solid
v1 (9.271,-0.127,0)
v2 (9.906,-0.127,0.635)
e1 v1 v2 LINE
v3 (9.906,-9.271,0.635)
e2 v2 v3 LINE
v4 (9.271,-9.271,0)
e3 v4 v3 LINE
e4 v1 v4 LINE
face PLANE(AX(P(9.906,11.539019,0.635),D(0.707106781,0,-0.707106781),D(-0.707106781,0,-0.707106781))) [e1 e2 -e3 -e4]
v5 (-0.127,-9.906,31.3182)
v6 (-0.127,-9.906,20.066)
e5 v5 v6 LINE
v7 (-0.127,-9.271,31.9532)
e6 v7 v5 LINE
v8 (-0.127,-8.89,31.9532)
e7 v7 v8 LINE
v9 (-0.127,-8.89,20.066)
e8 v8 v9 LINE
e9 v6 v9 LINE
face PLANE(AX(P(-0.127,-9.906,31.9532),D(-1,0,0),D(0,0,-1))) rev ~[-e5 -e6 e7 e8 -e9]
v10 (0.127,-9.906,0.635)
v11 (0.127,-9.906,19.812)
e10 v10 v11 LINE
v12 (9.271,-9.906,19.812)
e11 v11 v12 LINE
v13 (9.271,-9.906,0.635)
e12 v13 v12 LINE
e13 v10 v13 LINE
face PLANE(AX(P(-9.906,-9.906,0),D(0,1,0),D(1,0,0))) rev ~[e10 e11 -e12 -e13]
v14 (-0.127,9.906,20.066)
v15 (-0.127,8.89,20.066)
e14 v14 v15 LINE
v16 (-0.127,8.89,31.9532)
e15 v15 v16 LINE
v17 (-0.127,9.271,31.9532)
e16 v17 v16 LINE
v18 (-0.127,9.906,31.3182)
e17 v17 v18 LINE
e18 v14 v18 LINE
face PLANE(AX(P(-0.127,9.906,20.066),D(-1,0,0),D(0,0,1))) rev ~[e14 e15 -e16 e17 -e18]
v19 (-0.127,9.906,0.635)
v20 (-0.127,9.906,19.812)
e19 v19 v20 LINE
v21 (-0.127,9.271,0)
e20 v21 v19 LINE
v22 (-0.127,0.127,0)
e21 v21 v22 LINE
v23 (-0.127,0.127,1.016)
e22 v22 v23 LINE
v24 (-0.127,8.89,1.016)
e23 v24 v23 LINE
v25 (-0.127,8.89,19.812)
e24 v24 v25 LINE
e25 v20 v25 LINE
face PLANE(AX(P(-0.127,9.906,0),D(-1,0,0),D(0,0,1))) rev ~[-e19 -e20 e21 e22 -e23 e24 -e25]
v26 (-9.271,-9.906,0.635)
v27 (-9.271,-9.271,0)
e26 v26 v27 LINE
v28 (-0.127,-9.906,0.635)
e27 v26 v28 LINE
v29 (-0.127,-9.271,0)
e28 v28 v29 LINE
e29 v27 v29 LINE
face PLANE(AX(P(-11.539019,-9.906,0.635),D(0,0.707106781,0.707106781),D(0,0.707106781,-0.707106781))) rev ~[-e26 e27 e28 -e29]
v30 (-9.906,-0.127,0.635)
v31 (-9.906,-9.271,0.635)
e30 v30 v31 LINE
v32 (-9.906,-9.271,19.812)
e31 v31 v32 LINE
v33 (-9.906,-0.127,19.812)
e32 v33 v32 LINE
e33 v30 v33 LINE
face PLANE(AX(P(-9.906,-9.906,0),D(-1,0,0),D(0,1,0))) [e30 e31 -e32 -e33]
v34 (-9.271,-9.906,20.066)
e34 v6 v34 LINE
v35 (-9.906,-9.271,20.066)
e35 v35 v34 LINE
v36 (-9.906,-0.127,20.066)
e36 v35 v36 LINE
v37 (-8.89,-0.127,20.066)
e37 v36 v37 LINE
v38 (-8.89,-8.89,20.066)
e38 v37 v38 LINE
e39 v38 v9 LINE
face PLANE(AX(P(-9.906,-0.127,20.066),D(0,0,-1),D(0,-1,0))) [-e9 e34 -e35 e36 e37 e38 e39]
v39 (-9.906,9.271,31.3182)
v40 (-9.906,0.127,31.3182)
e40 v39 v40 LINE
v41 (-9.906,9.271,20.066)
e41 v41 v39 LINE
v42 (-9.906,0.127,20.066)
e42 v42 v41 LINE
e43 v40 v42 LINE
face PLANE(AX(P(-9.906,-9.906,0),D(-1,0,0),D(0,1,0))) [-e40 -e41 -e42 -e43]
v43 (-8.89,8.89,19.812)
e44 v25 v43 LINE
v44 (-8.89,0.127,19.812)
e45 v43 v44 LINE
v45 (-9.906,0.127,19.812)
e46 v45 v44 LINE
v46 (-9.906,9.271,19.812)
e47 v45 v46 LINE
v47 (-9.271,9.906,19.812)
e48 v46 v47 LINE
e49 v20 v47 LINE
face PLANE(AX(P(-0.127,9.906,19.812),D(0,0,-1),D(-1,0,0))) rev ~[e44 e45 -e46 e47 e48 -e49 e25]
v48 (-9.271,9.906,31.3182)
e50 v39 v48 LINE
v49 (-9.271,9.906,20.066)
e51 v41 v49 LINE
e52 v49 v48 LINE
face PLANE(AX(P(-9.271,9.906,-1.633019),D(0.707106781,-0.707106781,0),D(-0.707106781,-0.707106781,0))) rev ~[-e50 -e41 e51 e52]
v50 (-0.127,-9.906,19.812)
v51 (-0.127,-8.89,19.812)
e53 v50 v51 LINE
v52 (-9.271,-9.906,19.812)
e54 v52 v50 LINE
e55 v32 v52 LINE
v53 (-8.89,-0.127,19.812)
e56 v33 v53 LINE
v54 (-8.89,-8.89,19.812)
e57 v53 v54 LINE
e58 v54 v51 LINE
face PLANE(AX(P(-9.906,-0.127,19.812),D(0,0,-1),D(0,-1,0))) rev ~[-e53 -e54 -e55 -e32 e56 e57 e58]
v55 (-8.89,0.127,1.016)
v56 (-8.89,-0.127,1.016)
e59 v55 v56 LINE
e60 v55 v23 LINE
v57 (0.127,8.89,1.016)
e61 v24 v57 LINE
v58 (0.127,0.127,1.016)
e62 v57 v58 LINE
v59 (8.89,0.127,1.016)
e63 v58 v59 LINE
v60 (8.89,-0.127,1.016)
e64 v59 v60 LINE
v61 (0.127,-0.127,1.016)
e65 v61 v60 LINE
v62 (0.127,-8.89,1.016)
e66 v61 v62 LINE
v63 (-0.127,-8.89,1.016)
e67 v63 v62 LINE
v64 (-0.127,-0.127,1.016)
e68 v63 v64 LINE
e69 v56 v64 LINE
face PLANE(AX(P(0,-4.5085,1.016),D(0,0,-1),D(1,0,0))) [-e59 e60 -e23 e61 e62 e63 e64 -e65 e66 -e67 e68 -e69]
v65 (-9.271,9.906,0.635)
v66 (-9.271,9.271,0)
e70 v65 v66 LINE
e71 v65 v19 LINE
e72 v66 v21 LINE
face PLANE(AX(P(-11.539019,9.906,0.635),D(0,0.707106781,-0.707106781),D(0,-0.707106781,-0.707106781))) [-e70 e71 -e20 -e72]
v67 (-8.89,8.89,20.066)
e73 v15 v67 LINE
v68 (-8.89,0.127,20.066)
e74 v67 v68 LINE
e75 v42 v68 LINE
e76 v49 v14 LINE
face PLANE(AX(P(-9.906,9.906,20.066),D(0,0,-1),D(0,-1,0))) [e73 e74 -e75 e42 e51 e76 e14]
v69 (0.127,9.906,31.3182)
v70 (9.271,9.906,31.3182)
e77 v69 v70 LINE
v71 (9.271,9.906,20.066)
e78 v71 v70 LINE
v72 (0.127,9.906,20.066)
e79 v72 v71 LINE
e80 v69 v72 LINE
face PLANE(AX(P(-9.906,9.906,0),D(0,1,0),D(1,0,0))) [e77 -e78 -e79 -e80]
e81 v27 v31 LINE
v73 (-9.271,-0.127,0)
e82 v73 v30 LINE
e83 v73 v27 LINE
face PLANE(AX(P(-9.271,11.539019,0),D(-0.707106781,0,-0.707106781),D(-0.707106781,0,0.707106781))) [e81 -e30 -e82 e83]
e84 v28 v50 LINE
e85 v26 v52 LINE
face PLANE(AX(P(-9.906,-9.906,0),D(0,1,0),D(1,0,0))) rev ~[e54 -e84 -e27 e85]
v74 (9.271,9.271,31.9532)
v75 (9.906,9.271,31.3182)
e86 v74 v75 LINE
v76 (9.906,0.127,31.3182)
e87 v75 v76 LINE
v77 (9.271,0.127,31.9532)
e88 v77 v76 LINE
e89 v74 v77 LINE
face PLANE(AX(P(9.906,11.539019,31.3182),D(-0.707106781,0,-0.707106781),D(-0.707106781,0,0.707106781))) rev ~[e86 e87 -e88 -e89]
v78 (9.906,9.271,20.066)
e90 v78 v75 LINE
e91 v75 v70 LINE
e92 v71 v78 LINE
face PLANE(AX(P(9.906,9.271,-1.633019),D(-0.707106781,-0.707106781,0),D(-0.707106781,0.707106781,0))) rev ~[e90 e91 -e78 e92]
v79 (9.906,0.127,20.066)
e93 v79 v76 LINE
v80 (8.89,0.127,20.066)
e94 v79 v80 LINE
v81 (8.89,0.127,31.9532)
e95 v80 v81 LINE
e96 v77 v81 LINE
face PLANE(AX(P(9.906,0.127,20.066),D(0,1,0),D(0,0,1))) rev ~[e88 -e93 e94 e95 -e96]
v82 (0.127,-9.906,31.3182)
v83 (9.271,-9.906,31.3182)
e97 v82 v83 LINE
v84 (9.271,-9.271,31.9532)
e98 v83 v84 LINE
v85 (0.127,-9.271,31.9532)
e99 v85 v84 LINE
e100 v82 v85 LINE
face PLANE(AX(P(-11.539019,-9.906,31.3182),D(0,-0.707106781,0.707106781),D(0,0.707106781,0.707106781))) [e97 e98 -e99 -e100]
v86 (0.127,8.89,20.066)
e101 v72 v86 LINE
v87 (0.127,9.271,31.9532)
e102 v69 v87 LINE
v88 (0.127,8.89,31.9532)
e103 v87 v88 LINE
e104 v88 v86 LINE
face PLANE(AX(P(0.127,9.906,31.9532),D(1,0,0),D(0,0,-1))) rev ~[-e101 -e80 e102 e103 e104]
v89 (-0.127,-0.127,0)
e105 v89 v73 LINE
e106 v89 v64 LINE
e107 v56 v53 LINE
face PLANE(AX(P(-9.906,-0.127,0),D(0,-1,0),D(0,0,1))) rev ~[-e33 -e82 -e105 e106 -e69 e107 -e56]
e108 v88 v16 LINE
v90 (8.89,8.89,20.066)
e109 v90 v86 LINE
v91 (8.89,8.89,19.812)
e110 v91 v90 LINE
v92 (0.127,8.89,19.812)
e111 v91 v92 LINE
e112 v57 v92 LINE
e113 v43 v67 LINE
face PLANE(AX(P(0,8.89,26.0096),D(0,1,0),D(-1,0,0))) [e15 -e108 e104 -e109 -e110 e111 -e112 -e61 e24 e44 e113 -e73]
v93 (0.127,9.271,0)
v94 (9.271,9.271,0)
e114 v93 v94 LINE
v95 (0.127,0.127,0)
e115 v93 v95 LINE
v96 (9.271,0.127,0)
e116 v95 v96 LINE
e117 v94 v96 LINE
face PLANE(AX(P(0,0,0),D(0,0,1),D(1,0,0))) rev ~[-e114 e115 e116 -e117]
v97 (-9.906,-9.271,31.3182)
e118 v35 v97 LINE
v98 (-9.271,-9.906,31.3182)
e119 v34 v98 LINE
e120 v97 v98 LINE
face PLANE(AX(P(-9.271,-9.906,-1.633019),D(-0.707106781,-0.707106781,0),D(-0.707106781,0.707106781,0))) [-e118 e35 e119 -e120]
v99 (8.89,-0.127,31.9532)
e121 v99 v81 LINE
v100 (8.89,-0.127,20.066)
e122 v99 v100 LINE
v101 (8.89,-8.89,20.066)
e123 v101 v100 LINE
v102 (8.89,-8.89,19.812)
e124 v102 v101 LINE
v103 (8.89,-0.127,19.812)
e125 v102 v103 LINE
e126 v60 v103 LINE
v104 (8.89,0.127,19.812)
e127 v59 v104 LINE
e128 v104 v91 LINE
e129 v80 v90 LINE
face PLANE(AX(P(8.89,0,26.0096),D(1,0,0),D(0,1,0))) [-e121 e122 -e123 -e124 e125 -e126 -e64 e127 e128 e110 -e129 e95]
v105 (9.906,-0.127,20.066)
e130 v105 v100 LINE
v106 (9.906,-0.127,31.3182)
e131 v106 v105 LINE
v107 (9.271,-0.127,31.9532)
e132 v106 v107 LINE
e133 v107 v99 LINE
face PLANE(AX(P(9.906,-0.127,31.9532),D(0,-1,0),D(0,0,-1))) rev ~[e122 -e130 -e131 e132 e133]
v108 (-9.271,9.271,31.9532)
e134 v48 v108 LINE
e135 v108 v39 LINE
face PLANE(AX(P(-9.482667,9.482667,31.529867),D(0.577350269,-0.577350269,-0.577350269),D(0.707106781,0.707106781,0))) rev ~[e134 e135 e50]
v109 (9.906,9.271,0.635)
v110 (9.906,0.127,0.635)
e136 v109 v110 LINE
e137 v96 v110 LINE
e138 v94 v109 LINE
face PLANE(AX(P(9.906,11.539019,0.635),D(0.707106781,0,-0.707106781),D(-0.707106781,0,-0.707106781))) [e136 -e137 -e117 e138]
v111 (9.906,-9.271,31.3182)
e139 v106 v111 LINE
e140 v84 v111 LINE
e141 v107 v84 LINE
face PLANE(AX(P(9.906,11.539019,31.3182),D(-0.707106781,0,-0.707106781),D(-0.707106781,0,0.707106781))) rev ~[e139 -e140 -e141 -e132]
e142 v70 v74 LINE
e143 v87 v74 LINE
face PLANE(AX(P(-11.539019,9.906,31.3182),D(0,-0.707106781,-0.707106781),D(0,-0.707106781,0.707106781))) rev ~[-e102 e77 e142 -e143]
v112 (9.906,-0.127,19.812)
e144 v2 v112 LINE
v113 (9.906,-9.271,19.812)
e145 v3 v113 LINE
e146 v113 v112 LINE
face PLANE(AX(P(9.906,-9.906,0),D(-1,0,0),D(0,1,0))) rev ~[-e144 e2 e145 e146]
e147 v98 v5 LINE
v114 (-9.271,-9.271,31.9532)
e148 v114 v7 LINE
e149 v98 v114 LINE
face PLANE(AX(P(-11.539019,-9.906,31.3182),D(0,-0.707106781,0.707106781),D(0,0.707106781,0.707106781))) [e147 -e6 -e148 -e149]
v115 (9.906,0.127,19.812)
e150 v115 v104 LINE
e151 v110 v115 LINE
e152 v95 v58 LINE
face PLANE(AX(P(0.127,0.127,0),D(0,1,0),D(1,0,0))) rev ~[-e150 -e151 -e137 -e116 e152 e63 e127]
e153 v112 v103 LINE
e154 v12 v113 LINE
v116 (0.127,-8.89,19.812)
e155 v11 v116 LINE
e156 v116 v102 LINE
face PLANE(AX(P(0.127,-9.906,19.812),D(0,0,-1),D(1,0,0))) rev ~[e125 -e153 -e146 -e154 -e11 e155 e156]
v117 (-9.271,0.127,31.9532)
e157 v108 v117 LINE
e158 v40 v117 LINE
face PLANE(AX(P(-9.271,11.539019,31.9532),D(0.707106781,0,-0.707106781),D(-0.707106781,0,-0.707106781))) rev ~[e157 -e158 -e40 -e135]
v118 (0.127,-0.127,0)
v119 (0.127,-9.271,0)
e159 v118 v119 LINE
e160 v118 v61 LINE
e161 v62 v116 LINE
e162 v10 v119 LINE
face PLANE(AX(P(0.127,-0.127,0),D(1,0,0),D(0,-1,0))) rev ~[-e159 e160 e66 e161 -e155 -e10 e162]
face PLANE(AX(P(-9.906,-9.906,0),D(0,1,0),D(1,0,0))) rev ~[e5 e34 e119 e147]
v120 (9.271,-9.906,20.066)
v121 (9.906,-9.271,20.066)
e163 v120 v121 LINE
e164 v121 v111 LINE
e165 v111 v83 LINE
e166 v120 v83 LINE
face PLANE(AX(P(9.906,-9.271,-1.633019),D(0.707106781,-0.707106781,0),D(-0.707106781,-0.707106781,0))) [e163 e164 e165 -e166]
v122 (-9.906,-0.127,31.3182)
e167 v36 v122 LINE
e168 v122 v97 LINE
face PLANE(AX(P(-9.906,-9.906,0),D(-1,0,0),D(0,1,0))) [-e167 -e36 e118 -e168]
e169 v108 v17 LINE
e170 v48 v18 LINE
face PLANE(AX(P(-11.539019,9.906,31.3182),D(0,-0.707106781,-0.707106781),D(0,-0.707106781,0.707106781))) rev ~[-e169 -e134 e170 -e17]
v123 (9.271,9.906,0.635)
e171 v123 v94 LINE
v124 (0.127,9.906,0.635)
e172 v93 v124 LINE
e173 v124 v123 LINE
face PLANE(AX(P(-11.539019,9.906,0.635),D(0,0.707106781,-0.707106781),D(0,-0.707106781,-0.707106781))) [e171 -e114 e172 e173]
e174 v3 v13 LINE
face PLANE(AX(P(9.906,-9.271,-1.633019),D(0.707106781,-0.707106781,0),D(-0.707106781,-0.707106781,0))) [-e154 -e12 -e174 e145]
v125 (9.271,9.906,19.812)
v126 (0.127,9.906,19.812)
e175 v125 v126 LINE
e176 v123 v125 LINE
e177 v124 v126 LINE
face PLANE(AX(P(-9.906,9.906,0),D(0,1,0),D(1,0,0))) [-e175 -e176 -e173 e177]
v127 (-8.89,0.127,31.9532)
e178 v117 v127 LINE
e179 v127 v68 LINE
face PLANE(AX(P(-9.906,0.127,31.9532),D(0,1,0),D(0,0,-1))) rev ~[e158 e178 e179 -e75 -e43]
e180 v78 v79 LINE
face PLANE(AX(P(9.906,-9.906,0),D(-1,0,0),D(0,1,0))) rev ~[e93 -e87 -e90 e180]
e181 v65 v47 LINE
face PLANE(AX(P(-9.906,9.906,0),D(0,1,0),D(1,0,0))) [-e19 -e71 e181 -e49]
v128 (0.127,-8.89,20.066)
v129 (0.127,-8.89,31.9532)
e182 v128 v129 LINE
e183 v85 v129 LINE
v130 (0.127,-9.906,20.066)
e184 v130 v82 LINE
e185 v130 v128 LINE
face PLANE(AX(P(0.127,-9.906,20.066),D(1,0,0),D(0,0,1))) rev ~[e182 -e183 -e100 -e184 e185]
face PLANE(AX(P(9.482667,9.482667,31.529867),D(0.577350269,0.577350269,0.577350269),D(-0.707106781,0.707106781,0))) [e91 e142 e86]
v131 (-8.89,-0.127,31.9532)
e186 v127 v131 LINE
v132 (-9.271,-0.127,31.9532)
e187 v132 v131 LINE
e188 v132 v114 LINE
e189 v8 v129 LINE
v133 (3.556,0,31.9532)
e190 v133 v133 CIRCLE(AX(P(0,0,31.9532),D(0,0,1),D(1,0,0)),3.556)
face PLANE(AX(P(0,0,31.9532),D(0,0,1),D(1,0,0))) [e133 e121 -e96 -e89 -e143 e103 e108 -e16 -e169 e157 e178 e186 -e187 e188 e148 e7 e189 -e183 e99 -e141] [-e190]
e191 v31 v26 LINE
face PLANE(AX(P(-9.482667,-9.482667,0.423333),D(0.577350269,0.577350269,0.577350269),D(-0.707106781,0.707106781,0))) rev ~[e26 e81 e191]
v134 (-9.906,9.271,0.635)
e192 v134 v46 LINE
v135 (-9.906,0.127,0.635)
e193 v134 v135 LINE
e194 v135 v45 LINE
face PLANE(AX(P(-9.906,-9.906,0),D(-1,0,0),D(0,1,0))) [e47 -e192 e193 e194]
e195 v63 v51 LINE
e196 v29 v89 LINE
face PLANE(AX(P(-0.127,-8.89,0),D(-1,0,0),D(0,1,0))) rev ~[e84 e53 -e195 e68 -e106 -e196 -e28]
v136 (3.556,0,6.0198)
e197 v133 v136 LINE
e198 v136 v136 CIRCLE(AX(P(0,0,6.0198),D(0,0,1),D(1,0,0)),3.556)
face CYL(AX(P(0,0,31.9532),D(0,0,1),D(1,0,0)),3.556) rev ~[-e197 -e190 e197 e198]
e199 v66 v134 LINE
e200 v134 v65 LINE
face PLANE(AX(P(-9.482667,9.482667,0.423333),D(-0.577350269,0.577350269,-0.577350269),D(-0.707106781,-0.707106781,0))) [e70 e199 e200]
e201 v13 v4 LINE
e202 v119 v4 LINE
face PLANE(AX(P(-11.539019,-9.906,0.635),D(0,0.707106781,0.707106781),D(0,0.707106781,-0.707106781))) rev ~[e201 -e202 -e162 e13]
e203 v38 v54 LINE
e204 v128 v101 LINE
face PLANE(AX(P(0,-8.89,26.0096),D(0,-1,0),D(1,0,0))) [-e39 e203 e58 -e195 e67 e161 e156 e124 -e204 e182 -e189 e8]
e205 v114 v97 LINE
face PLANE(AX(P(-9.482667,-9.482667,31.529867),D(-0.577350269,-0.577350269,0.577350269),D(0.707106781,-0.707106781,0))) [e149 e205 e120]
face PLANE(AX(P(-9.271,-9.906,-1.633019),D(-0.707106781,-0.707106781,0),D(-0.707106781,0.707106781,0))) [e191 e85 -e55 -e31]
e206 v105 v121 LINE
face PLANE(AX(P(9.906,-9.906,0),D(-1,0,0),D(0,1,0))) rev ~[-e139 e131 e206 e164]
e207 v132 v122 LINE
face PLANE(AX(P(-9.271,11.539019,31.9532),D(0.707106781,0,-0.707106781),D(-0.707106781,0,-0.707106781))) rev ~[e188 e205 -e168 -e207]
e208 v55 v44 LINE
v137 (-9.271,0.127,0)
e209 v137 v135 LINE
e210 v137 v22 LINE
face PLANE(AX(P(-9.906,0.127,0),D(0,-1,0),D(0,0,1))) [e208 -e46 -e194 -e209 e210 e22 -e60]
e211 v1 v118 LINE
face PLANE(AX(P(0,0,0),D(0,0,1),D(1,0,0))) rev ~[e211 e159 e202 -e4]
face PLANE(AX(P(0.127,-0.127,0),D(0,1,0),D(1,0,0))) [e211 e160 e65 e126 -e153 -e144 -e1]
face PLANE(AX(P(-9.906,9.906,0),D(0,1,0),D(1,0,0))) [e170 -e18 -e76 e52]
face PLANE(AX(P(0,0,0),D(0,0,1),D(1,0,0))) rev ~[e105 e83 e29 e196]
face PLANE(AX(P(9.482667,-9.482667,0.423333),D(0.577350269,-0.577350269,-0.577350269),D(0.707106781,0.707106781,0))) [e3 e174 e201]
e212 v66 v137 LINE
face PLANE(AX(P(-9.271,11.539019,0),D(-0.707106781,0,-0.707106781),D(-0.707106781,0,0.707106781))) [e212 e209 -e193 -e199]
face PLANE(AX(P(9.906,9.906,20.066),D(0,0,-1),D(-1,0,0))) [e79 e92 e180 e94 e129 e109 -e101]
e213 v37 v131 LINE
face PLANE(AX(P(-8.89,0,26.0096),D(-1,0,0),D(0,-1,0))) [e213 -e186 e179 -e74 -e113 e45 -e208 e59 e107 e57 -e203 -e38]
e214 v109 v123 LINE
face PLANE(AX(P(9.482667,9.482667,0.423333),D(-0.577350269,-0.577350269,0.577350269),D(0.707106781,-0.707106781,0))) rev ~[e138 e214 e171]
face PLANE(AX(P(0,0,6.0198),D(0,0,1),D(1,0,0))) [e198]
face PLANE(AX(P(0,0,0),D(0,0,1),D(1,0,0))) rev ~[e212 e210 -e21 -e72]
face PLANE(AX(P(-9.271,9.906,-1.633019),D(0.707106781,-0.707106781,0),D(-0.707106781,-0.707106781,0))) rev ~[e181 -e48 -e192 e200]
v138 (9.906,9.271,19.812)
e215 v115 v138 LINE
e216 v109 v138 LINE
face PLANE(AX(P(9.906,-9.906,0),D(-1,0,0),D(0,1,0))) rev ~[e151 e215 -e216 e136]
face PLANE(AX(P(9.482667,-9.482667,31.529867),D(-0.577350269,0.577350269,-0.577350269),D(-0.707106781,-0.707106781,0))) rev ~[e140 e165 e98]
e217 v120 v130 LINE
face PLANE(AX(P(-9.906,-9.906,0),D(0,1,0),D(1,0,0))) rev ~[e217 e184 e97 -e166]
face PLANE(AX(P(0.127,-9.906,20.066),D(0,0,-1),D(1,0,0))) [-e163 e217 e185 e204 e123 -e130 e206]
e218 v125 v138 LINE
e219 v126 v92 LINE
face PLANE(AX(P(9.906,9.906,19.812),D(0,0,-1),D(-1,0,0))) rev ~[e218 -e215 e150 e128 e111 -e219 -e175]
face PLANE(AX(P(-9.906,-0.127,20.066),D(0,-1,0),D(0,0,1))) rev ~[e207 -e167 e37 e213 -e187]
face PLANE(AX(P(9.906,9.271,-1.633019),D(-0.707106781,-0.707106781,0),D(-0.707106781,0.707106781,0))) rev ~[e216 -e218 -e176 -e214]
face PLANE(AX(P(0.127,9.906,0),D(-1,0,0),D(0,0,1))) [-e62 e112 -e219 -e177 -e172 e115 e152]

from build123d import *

# Parameters (mm, degrees)
F0_W            = 19.812
F0_H            = 19.812
F1_DEPTH        = 31.9532
F2_R            = 3.556
F3_DEPTH        = 25.9334
F4_T1_DEPTH     = 0.8065583261
F4_T3_DEPTH     = 0.8065583261
F4_T5_DEPTH     = 0.8065583261
F4_T7_DEPTH     = 0.8065583261
F4_T9_DEPTH     = 0.8065583261
F4_T11_DEPTH    = 0.8065583261
F4_T13_DEPTH    = 0.8065583261
F4_T15_DEPTH    = 0.8065583261
F4_T17_DEPTH    = 35.2192373947
F4_T19_DEPTH    = 23.0780373947
F4_T21_DEPTH    = 23.0780373947
F5_W            = 0.254
F5_H            = 11.8872
F5_H_2          = 0.254
F5_W_2          = 9.779
F5_H_3          = 19.812
F6_DEPTH        = 1.016
F6_COPIES_COUNT = 4
F7_W            = 0.254
F7_H            = 8.763
F7_H_2          = 0.254
F7_W_2          = 8.763
F8_DEPTH        = 1.016


# Not quite as in the source:
# - a fillet or chamfer that OpenCascade refuses, or shapes differently, is made with other operations: its cross-section is extruded or revolved along the edge and cut away or added
# - a pattern or mirror of a feature is missing from the dataset's text; its kind, count and spacing are read off the source's solid


with BuildPart() as f1:
    # F0 (on Top) → F1 (new body)
    with BuildSketch(Plane.XY):
        Rectangle(F0_W, F0_H)
    extrude(amount=F1_DEPTH)

    # F2 (on face) → F3 (cut)
    with BuildSketch(Plane.XY.offset(31.9532)):
        Circle(F2_R)
    extrude(amount=-F3_DEPTH, mode=Mode.SUBTRACT)

    # F4: chamfer of 0.635 on 12 edges, made by hand

    # F4_s2 → F4_t1 (cut)
    with BuildSketch(Plane(origin=(-6.1806666667, 6.1806666667, -6.1806666667), x_dir=(-0.7071067812, -0.7071067812, 0), z_dir=(-0.5773502692, 0.5773502692, -0.5773502692))):
        Polygon((-0.4490128061, 8.3474527951), (0, 7.5697398018), (0.4490128061, 8.3474527951), align=None)
    extrude(amount=F4_T1_DEPTH, mode=Mode.SUBTRACT)

    # F4_s4 → F4_t3 (cut)
    with BuildSketch(Plane(origin=(-16.8317333333, 16.8317333333, 16.8317333333), x_dir=(-0.7071067812, -0.7071067812, 0), z_dir=(-0.5773502692, 0.5773502692, 0.5773502692))):
        Polygon((-0.4490128061, 17.7422257546), (0, 18.5199387479), (0.4490128061, 17.7422257546), align=None)
    extrude(amount=F4_T3_DEPTH, mode=Mode.SUBTRACT)

    # F4_s6 → F4_t5 (cut)
    with BuildSketch(Plane(origin=(-6.1806666667, -6.1806666667, -6.1806666667), x_dir=(0.7071067812, -0.7071067812, 0), z_dir=(-0.5773502692, -0.5773502692, -0.5773502692))):
        Polygon((0.4490128061, 8.3474527951), (0, 7.5697398018), (-0.4490128061, 8.3474527951), align=None)
    extrude(amount=F4_T5_DEPTH, mode=Mode.SUBTRACT)

    # F4_s8 → F4_t7 (cut)
    with BuildSketch(Plane(origin=(-16.8317333333, -16.8317333333, 16.8317333333), x_dir=(0.7071067812, -0.7071067812, 0), z_dir=(-0.5773502692, -0.5773502692, 0.5773502692))):
        Polygon((0.4490128061, 17.7422257546), (0, 18.5199387479), (-0.4490128061, 17.7422257546), align=None)
    extrude(amount=F4_T7_DEPTH, mode=Mode.SUBTRACT)

    # F4_s10 → F4_t9 (cut)
    with BuildSketch(Plane(origin=(6.1806666667, -6.1806666667, -6.1806666667), x_dir=(0.7071067812, 0.7071067812, 0), z_dir=(0.5773502692, -0.5773502692, -0.5773502692))):
        Polygon((0.4490128061, 8.3474527951), (-0.4490128061, 8.3474527951), (0, 7.5697398018), align=None)
    extrude(amount=F4_T9_DEPTH, mode=Mode.SUBTRACT)

    # F4_s12 → F4_t11 (cut)
    with BuildSketch(Plane(origin=(16.8317333333, -16.8317333333, 16.8317333333), x_dir=(0.7071067812, 0.7071067812, 0), z_dir=(0.5773502692, -0.5773502692, 0.5773502692))):
        Polygon((0.4490128061, 17.7422257546), (-0.4490128061, 17.7422257546), (0, 18.5199387479), align=None)
    extrude(amount=F4_T11_DEPTH, mode=Mode.SUBTRACT)

    # F4_s14 → F4_t13 (cut)
    with BuildSketch(Plane(origin=(6.1806666667, 6.1806666667, -6.1806666667), x_dir=(-0.7071067812, 0.7071067812, 0), z_dir=(0.5773502692, 0.5773502692, -0.5773502692))):
        Polygon((-0.4490128061, 8.3474527951), (0.4490128061, 8.3474527951), (0, 7.5697398018), align=None)
    extrude(amount=F4_T13_DEPTH, mode=Mode.SUBTRACT)

    # F4_s16 → F4_t15 (cut)
    with BuildSketch(Plane(origin=(16.8317333333, 16.8317333333, 16.8317333333), x_dir=(-0.7071067812, 0.7071067812, 0), z_dir=(0.5773502692, 0.5773502692, 0.5773502692))):
        Polygon((-0.4490128061, 17.7422257546), (0.4490128061, 17.7422257546), (0, 18.5199387479), align=None)
    extrude(amount=F4_T15_DEPTH, mode=Mode.SUBTRACT)

    # F4_s18 → F4_t17 (cut)
    with BuildSketch(Plane.XY.offset(-1.6330186974)):
        Polygon((-9.271, 9.906), (-9.906, 9.271), (-9.906, 9.906), align=None)
        Polygon((-9.271, -9.906), (-9.906, -9.271), (-9.906, -9.906), align=None)
        Polygon((9.906, -9.271), (9.271, -9.906), (9.906, -9.906), align=None)
        Polygon((9.906, 9.271), (9.271, 9.906), (9.906, 9.906), align=None)
    extrude(amount=F4_T17_DEPTH, mode=Mode.SUBTRACT)

    # F4_s20 → F4_t19 (cut)
    with BuildSketch(Plane.XZ.offset(-11.5390186974)):
        Polygon((9.906, 31.3182), (9.271, 31.9532), (9.906, 31.9532), align=None)
        Polygon((-9.271, 31.9532), (-9.906, 31.3182), (-9.906, 31.9532), align=None)
        Polygon((9.906, 0.635), (9.271, 0), (9.906, 0), align=None)
        Polygon((-9.271, 0), (-9.906, 0.635), (-9.906, 0), align=None)
    extrude(amount=F4_T19_DEPTH, mode=Mode.SUBTRACT)

    # F4_s22 → F4_t21 (cut)
    with BuildSketch(Plane.YZ.offset(-11.5390186974)):
        Polygon((-9.906, 31.3182), (-9.271, 31.9532), (-9.906, 31.9532), align=None)
        Polygon((9.906, 31.3182), (9.271, 31.9532), (9.906, 31.9532), align=None)
        Polygon((9.906, 0.635), (9.271, 0), (9.906, 0), align=None)
        Polygon((-9.906, 0.635), (-9.271, 0), (-9.906, 0), align=None)
    extrude(amount=F4_T21_DEPTH, mode=Mode.SUBTRACT)

    # F5 (on face) → F6 (cut)
    with BuildSketch(Plane.XZ.offset(9.906)):
        with Locations((0, 26.0096)):
            Rectangle(F5_W, F5_H)
        with Locations((0, 19.939)):
            Rectangle(F5_W, F5_H_2)
        with Locations((-5.0165, 19.939)):
            Rectangle(F5_W_2, F5_H_2)
        with Locations((5.0165, 19.939)):
            Rectangle(F5_W_2, F5_H_2)
        with Locations((0, 9.906)):
            Rectangle(F5_W, F5_H_3)
    f6 = extrude(amount=-F6_DEPTH, mode=Mode.SUBTRACT)

    # F6_copies: F6 ×4 about axis
    f6_copies_axis = Axis((0, 0, 0), (0, 0, 1))
    for i in range(1, F6_COPIES_COUNT):
        add(f6.rotate(f6_copies_axis, i * 360 / F6_COPIES_COUNT), mode=Mode.SUBTRACT)

    # F7 (on face) → F8 (cut)
    with BuildSketch(Plane(origin=(0, 0, 0), x_dir=(1, 0, 0), z_dir=(0, 0, -1))):
        with Locations((0, 4.5085)):
            Rectangle(F7_W, F7_H)
        Rectangle(F7_W, F7_H_2)
        with Locations((-4.5085, 0)):
            Rectangle(F7_W_2, F7_H_2)
        with Locations((4.5085, 0)):
            Rectangle(F7_W_2, F7_H_2)
        with Locations((0, -4.5085)):
            Rectangle(F7_W, F7_H)
    extrude(amount=-F8_DEPTH, mode=Mode.SUBTRACT)


solid = f1.part
